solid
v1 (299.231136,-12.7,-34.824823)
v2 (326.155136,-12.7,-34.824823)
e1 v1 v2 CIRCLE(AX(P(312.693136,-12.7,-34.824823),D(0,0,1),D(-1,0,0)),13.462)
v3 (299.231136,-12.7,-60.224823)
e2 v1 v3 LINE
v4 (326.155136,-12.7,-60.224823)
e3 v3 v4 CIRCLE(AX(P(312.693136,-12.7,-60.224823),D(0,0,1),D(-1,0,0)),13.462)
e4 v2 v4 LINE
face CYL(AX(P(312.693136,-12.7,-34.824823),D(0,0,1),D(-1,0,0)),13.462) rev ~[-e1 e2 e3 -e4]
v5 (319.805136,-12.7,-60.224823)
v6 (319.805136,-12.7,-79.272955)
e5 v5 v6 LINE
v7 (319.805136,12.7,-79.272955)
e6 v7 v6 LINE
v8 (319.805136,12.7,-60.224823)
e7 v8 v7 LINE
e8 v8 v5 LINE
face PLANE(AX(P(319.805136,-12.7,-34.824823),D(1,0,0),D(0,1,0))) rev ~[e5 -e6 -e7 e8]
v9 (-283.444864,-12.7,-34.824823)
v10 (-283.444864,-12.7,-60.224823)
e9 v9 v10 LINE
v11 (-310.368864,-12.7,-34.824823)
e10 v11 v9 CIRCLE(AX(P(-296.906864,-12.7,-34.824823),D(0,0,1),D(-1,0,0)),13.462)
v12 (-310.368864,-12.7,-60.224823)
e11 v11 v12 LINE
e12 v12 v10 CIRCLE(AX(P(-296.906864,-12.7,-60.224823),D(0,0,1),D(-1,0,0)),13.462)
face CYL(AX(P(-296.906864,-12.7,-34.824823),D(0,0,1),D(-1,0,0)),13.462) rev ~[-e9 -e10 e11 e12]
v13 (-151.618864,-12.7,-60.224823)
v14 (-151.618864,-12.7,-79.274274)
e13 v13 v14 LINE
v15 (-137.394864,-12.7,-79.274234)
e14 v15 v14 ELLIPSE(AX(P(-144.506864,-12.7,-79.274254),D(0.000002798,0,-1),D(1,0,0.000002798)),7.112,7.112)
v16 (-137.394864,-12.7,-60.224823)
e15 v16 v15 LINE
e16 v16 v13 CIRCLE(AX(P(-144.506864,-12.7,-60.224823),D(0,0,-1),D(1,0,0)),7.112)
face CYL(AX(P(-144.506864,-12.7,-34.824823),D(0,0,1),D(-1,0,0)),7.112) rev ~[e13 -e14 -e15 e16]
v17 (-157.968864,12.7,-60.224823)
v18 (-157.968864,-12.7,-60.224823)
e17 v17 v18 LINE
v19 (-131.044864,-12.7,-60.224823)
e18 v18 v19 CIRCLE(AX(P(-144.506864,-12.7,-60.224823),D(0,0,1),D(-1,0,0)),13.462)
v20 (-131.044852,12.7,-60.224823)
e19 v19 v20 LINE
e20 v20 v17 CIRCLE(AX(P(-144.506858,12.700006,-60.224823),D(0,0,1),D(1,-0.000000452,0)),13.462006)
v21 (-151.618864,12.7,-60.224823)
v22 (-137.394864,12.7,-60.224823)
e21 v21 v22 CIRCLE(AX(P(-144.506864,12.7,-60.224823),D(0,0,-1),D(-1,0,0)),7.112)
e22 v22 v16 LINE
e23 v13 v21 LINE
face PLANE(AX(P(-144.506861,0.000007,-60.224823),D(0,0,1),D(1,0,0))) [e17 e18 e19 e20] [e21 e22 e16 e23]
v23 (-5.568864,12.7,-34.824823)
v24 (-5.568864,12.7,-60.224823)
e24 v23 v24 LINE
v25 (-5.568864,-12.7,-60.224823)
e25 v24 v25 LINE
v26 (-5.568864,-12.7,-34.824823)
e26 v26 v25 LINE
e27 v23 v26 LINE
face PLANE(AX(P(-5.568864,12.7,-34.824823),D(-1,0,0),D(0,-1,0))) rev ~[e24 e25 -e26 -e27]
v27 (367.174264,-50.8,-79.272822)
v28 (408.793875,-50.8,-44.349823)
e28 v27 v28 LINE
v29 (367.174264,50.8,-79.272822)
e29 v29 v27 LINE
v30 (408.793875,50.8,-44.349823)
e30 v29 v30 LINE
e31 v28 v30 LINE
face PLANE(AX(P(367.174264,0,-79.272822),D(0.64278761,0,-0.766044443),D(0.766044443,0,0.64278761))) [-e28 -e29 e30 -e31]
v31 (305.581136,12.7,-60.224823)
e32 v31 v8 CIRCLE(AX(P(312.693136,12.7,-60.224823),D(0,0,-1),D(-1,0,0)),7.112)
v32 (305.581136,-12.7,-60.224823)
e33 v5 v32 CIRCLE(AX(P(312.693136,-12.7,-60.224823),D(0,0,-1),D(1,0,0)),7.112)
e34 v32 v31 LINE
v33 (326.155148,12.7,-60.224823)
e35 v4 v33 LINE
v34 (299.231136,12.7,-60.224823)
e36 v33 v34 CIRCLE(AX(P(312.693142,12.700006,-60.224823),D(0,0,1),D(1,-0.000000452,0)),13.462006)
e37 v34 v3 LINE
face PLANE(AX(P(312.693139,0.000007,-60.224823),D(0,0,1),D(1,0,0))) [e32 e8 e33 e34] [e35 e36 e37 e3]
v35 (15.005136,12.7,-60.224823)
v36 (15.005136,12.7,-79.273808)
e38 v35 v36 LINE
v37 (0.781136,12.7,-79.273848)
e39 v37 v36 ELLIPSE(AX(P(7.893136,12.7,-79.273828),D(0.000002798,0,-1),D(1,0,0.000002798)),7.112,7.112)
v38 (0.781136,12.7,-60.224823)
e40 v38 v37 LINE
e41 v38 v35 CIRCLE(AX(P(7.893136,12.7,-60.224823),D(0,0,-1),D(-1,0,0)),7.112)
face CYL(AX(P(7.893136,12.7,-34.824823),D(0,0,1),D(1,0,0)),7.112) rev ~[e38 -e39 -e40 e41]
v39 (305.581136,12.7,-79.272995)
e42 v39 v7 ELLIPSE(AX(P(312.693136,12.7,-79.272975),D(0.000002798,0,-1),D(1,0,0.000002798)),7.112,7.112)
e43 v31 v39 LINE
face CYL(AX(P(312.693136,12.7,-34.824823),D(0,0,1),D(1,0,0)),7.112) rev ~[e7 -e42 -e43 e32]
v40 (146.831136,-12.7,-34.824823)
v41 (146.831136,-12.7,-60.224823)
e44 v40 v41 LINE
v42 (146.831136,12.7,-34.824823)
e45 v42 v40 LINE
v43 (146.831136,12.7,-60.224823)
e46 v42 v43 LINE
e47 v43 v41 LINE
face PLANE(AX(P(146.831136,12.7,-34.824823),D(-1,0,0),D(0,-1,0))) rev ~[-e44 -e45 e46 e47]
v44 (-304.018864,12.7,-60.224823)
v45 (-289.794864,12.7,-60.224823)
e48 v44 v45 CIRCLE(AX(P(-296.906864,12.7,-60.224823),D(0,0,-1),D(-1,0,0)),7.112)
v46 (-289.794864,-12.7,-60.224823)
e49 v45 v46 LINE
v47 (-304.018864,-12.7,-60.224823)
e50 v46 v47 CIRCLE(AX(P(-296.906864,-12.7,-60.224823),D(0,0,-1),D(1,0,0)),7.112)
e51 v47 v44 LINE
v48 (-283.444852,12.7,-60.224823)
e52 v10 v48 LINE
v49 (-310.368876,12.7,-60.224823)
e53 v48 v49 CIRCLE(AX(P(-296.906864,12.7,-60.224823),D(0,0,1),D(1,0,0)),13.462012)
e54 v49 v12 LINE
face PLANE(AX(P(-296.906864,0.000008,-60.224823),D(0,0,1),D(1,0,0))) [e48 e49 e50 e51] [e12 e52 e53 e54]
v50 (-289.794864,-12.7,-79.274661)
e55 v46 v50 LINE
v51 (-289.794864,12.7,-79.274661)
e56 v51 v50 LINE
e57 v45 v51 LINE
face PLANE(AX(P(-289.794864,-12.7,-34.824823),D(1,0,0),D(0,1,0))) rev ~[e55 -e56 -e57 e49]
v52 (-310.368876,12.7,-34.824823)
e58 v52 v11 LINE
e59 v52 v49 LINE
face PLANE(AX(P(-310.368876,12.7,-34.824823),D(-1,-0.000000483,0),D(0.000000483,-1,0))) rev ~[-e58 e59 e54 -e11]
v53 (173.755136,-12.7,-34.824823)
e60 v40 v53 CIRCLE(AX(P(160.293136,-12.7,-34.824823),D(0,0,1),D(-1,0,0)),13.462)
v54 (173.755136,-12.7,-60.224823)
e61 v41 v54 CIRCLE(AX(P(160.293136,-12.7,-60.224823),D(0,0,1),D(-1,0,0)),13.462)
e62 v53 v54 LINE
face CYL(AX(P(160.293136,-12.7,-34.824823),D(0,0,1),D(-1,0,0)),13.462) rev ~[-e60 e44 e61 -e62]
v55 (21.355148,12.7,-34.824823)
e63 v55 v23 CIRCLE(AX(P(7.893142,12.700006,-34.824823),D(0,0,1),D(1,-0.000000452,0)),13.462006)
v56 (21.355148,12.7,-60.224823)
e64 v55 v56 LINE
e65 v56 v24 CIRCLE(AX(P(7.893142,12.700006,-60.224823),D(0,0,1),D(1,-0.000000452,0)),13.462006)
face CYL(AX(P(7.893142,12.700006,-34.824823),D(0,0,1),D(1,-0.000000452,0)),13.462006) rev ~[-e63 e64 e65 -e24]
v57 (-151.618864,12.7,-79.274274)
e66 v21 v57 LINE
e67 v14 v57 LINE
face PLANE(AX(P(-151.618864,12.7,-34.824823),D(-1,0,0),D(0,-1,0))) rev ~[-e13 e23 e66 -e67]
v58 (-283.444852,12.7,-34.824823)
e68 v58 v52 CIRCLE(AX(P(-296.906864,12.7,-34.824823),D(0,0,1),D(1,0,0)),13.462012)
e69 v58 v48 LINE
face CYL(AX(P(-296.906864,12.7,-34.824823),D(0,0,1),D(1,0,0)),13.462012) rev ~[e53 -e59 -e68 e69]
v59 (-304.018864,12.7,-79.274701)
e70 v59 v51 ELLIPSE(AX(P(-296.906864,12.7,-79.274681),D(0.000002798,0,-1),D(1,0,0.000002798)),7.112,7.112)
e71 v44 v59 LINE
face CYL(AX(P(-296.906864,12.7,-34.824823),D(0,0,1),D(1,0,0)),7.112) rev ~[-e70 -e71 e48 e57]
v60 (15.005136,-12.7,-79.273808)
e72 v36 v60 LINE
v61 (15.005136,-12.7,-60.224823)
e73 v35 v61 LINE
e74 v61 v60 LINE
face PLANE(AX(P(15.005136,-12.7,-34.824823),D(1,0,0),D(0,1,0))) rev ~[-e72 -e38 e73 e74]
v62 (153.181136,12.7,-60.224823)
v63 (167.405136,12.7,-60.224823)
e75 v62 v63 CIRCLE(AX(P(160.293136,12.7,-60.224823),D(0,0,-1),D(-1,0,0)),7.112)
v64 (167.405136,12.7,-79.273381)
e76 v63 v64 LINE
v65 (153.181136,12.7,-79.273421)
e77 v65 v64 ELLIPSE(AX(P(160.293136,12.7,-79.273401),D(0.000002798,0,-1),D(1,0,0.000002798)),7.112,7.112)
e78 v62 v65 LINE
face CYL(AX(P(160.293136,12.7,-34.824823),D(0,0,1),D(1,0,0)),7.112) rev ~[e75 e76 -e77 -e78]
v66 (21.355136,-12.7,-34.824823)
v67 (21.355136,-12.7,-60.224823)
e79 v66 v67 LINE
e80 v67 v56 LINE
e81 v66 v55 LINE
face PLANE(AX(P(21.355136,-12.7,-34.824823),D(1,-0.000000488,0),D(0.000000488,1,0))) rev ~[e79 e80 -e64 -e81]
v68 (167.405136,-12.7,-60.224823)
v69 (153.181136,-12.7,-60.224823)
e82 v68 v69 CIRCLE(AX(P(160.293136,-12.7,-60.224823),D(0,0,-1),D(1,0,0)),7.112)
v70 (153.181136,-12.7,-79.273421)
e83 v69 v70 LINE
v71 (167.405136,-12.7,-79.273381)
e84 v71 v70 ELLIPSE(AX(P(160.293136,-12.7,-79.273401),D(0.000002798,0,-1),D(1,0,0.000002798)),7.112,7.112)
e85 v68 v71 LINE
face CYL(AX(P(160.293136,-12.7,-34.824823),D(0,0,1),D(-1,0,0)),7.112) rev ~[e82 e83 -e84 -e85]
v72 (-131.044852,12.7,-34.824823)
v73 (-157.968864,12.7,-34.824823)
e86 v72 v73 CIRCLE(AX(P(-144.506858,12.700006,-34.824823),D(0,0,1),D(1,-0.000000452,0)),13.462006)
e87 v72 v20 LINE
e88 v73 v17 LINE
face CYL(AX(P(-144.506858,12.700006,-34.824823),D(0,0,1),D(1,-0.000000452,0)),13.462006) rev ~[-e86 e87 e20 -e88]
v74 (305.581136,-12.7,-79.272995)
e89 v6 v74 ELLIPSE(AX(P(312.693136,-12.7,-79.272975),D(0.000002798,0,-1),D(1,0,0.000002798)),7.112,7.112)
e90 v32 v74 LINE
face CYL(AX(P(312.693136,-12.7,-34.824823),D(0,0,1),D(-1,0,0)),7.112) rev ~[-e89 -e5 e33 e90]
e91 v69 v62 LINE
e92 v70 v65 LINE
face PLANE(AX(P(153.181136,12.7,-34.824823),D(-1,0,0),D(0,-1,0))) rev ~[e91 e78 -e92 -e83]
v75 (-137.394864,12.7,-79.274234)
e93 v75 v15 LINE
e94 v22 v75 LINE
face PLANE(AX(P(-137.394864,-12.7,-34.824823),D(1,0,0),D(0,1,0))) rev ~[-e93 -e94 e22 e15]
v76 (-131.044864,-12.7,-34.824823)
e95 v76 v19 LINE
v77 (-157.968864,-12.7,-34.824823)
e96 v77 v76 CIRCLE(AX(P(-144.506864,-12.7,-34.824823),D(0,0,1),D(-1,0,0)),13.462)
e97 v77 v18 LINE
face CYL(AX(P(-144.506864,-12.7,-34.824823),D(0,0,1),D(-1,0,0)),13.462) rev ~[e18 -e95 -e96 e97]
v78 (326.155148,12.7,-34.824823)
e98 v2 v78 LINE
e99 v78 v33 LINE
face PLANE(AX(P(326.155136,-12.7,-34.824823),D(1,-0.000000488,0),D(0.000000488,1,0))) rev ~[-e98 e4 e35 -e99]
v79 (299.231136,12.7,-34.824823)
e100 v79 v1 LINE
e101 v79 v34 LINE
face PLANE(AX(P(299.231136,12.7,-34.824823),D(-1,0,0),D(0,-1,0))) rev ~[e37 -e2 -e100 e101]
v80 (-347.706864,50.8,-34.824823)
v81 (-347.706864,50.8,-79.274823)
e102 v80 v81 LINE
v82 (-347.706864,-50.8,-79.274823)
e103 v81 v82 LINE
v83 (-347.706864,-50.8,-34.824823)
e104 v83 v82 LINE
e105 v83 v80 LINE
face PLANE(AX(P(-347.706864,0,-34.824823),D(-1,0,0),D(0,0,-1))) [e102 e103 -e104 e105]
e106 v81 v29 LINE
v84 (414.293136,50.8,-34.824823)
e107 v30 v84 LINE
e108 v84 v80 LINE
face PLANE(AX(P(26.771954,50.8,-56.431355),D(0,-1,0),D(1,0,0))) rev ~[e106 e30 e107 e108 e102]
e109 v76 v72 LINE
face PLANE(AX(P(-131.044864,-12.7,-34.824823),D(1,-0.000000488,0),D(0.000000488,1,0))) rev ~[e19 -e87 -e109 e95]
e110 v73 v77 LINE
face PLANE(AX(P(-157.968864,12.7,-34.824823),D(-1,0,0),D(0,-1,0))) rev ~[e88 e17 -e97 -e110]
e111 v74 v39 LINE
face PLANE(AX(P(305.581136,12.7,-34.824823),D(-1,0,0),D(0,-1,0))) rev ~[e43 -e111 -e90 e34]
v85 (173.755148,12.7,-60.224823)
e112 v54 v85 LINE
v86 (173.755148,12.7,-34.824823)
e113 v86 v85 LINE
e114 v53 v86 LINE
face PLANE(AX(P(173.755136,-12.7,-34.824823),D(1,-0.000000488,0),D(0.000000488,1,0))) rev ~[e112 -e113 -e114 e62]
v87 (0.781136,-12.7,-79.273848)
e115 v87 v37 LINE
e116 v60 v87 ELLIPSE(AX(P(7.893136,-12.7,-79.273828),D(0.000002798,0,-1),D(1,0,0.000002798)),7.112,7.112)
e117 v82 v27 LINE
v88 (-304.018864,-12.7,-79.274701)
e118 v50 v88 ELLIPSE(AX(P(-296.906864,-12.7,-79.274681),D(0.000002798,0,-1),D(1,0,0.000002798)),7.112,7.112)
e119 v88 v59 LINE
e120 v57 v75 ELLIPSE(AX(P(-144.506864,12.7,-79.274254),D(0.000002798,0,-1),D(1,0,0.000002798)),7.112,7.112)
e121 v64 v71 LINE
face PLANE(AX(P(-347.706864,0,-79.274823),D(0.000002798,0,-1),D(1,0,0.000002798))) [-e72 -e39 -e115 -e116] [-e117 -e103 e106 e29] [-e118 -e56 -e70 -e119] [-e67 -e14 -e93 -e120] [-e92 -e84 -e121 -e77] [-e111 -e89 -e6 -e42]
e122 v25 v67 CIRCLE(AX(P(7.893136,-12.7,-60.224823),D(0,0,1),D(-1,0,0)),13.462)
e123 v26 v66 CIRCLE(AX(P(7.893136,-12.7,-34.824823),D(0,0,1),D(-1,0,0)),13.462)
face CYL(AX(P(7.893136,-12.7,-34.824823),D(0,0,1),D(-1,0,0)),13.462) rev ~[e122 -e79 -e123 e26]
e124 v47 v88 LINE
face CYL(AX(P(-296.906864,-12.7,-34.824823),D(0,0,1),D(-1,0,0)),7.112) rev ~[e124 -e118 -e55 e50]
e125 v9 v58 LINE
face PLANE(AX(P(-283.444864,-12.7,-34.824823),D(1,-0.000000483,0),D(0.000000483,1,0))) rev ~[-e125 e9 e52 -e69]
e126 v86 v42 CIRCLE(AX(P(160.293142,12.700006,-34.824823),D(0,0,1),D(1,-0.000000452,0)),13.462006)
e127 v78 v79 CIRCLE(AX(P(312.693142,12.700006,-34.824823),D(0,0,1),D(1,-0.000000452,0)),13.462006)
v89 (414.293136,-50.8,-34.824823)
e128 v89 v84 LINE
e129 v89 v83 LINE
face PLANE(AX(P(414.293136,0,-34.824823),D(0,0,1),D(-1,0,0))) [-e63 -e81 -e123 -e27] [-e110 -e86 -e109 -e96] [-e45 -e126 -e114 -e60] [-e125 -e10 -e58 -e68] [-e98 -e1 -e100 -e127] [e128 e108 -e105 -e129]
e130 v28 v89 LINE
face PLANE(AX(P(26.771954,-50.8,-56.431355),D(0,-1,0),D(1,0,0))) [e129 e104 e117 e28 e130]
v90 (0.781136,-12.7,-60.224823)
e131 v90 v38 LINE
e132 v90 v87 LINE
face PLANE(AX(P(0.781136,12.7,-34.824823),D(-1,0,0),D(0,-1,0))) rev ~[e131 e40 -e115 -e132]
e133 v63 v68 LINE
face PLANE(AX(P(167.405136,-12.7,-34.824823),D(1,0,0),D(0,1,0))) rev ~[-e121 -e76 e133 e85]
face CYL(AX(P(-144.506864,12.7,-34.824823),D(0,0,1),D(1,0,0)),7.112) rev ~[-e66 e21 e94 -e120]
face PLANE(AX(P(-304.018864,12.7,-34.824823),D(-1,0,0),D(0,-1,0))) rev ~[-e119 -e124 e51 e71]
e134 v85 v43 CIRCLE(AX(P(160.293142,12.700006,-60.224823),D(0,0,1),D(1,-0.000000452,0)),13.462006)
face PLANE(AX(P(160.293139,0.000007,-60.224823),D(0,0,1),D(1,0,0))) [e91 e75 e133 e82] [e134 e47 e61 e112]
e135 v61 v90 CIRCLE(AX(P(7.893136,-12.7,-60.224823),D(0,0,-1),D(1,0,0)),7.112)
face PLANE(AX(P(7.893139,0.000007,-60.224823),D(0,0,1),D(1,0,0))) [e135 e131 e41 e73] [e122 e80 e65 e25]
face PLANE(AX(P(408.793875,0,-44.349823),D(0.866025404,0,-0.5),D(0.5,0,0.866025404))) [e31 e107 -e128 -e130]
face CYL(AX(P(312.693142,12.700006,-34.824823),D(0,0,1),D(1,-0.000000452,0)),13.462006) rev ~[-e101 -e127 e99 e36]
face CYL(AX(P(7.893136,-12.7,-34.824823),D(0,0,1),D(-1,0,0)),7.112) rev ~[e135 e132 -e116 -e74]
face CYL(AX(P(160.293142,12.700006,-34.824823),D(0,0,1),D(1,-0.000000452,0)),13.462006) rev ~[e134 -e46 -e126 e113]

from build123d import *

# Parameters (mm, degrees)
F1_DEPTH = 50.8
F3_DEPTH = 44.451
F4_DEPTH = 25.4


# Not quite as in the source:
# - ends of sketch curves that miss each other by under 0.0002 mm in the source are joined


with BuildPart() as f1:
    # F0 (on Front) → F1 (new body, symmetric)
    with BuildSketch(Plane.XZ):
        Polygon((-347.7068640215, -34.8248227949), (-347.7068640215, -79.2748227949), (367.1742644244, -79.272822397), (408.7938746644, -44.3498227949), (414.2931359785, -34.8248227949), align=None)
    extrude(amount=F1_DEPTH, both=True)

    # F2 (on face) → F3 (cut, through all)
    with BuildSketch(Plane.XY.offset(-34.8248227949)):
        with BuildLine():
            ThreePointArc((-304.0188640215, -12.7), (-296.9068640215, -19.812), (-289.7948640215, -12.7))
            Line((-289.7948640215, -12.7), (-289.7948640215, 12.7))
            ThreePointArc((-289.7948640215, 12.7), (-296.9068640215, 19.812), (-304.0188640215, 12.7))
            Line((-304.0188640215, 12.7), (-304.0188640215, -12.7))
        make_face()
        with BuildLine():
            ThreePointArc((-151.6188640215, -12.7), (-144.5068640215, -19.812), (-137.3948640215, -12.7))
            Line((-137.3948640215, -12.7), (-137.3948640215, 12.7))
            ThreePointArc((-137.3948640215, 12.7), (-144.5068640215, 19.812), (-151.6188640215, 12.7))
            Line((-151.6188640215, 12.7), (-151.6188640215, -12.7))
        make_face()
        with BuildLine():
            ThreePointArc((0.7811359785, -12.7), (7.8931359785, -19.812), (15.0051359785, -12.7))
            Line((15.0051359785, -12.7), (15.0051359785, 12.7))
            ThreePointArc((15.0051359785, 12.7), (7.8931359785, 19.812), (0.7811359785, 12.7))
            Line((0.7811359785, 12.7), (0.7811359785, -12.7))
        make_face()
        with BuildLine():
            ThreePointArc((153.1811359785, -12.7), (160.2931359785, -19.812), (167.4051359785, -12.7))
            Line((167.4051359785, -12.7), (167.4051359785, 12.7))
            ThreePointArc((167.4051359785, 12.7), (160.2931359785, 19.812), (153.1811359785, 12.7))
            Line((153.1811359785, 12.7), (153.1811359785, -12.7))
        make_face()
        with BuildLine():
            ThreePointArc((305.5811359785, -12.7), (312.6931359785, -19.812), (319.8051359785, -12.7))
            Line((319.8051359785, -12.7), (319.8051359785, 12.7))
            ThreePointArc((319.8051359785, 12.7), (312.6931359785, 19.812), (305.5811359785, 12.7))
            Line((305.5811359785, 12.7), (305.5811359785, -12.7))
        make_face()
    extrude(amount=-F3_DEPTH, mode=Mode.SUBTRACT)

    # F2 (on face) → F4 (cut)
    with BuildSketch(Plane.XY.offset(-34.8248227949)):
        with BuildLine():
            ThreePointArc((-283.4448517417, 12.7), (-296.9068640215, 26.1620122798), (-310.3688763013, 12.7))
            Line((-310.3688763013, 12.7), (-310.3688640215, -12.7))
            ThreePointArc((-310.3688640215, -12.7), (-296.9068640215, -26.162), (-283.4448640215, -12.7))
            Line((-283.4448640215, -12.7), (-283.4448517417, 12.7))
        make_face()
        with BuildLine():
            Line((-289.7948640215, 12.7), (-289.7948640215, -12.7))
            ThreePointArc((-289.7948640215, -12.7), (-296.9068640215, -19.812), (-304.0188640215, -12.7))
            Line((-304.0188640215, -12.7), (-304.0188640215, 12.7))
            ThreePointArc((-304.0188640215, 12.7), (-296.9068640215, 19.812), (-289.7948640215, 12.7))
        make_face(mode=Mode.SUBTRACT)
        with BuildLine():
            Line((-157.9688640215, 12.7), (-157.9688640215, -12.7))
            ThreePointArc((-157.9688640215, -12.7), (-144.5068640215, -26.162), (-131.0448640215, -12.7))
            Line((-131.0448640215, -12.7), (-131.0448516369, 12.7))
            ThreePointArc((-131.0448516369, 12.7), (-144.5068640215, 26.1620122798), (-157.9688640215, 12.7))
        make_face()
        with BuildLine():
            Line((-137.3948640215, 12.7), (-137.3948640215, -12.7))
            ThreePointArc((-137.3948640215, -12.7), (-144.5068640215, -19.812), (-151.6188640215, -12.7))
            Line((-151.6188640215, -12.7), (-151.6188640215, 12.7))
            ThreePointArc((-151.6188640215, 12.7), (-144.5068640215, 19.812), (-137.3948640215, 12.7))
        make_face(mode=Mode.SUBTRACT)
        with BuildLine():
            Line((-5.5688640215, 12.7), (-5.5688640215, -12.7))
            ThreePointArc((-5.5688640215, -12.7), (7.8931359785, -26.162), (21.3551359785, -12.7))
            Line((21.3551359785, -12.7), (21.3551483631, 12.7))
            ThreePointArc((21.3551483631, 12.7), (7.8931359785, 26.1620122798), (-5.5688640215, 12.7))
        make_face()
        with BuildLine():
            Line((15.0051359785, 12.7), (15.0051359785, -12.7))
            ThreePointArc((15.0051359785, -12.7), (7.8931359785, -19.812), (0.7811359785, -12.7))
            Line((0.7811359785, -12.7), (0.7811359785, 12.7))
            ThreePointArc((0.7811359785, 12.7), (7.8931359785, 19.812), (15.0051359785, 12.7))
        make_face(mode=Mode.SUBTRACT)
        with BuildLine():
            Line((146.8311359785, 12.7), (146.8311359785, -12.7))
            ThreePointArc((146.8311359785, -12.7), (160.2931359785, -26.162), (173.7551359785, -12.7))
            Line((173.7551359785, -12.7), (173.7551483631, 12.7))
            ThreePointArc((173.7551483631, 12.7), (160.2931359785, 26.1620122798), (146.8311359785, 12.7))
        make_face()
        with BuildLine():
            Line((167.4051359785, 12.7), (167.4051359785, -12.7))
            ThreePointArc((167.4051359785, -12.7), (160.2931359785, -19.812), (153.1811359785, -12.7))
            Line((153.1811359785, -12.7), (153.1811359785, 12.7))
            ThreePointArc((153.1811359785, 12.7), (160.2931359785, 19.812), (167.4051359785, 12.7))
        make_face(mode=Mode.SUBTRACT)
        with BuildLine():
            Line((299.2311359785, 12.7), (299.2311359785, -12.7))
            ThreePointArc((299.2311359785, -12.7), (312.6931359785, -26.162), (326.1551359785, -12.7))
            Line((326.1551359785, -12.7), (326.1551483631, 12.7))
            ThreePointArc((326.1551483631, 12.7), (312.6931359785, 26.1620122798), (299.2311359785, 12.7))
        make_face()
        with BuildLine():
            Line((319.8051359785, 12.7), (319.8051359785, -12.7))
            ThreePointArc((319.8051359785, -12.7), (312.6931359785, -19.812), (305.5811359785, -12.7))
            Line((305.5811359785, -12.7), (305.5811359785, 12.7))
            ThreePointArc((305.5811359785, 12.7), (312.6931359785, 19.812), (319.8051359785, 12.7))
        make_face(mode=Mode.SUBTRACT)
    extrude(amount=-F4_DEPTH, mode=Mode.SUBTRACT)


solid = f1.part
